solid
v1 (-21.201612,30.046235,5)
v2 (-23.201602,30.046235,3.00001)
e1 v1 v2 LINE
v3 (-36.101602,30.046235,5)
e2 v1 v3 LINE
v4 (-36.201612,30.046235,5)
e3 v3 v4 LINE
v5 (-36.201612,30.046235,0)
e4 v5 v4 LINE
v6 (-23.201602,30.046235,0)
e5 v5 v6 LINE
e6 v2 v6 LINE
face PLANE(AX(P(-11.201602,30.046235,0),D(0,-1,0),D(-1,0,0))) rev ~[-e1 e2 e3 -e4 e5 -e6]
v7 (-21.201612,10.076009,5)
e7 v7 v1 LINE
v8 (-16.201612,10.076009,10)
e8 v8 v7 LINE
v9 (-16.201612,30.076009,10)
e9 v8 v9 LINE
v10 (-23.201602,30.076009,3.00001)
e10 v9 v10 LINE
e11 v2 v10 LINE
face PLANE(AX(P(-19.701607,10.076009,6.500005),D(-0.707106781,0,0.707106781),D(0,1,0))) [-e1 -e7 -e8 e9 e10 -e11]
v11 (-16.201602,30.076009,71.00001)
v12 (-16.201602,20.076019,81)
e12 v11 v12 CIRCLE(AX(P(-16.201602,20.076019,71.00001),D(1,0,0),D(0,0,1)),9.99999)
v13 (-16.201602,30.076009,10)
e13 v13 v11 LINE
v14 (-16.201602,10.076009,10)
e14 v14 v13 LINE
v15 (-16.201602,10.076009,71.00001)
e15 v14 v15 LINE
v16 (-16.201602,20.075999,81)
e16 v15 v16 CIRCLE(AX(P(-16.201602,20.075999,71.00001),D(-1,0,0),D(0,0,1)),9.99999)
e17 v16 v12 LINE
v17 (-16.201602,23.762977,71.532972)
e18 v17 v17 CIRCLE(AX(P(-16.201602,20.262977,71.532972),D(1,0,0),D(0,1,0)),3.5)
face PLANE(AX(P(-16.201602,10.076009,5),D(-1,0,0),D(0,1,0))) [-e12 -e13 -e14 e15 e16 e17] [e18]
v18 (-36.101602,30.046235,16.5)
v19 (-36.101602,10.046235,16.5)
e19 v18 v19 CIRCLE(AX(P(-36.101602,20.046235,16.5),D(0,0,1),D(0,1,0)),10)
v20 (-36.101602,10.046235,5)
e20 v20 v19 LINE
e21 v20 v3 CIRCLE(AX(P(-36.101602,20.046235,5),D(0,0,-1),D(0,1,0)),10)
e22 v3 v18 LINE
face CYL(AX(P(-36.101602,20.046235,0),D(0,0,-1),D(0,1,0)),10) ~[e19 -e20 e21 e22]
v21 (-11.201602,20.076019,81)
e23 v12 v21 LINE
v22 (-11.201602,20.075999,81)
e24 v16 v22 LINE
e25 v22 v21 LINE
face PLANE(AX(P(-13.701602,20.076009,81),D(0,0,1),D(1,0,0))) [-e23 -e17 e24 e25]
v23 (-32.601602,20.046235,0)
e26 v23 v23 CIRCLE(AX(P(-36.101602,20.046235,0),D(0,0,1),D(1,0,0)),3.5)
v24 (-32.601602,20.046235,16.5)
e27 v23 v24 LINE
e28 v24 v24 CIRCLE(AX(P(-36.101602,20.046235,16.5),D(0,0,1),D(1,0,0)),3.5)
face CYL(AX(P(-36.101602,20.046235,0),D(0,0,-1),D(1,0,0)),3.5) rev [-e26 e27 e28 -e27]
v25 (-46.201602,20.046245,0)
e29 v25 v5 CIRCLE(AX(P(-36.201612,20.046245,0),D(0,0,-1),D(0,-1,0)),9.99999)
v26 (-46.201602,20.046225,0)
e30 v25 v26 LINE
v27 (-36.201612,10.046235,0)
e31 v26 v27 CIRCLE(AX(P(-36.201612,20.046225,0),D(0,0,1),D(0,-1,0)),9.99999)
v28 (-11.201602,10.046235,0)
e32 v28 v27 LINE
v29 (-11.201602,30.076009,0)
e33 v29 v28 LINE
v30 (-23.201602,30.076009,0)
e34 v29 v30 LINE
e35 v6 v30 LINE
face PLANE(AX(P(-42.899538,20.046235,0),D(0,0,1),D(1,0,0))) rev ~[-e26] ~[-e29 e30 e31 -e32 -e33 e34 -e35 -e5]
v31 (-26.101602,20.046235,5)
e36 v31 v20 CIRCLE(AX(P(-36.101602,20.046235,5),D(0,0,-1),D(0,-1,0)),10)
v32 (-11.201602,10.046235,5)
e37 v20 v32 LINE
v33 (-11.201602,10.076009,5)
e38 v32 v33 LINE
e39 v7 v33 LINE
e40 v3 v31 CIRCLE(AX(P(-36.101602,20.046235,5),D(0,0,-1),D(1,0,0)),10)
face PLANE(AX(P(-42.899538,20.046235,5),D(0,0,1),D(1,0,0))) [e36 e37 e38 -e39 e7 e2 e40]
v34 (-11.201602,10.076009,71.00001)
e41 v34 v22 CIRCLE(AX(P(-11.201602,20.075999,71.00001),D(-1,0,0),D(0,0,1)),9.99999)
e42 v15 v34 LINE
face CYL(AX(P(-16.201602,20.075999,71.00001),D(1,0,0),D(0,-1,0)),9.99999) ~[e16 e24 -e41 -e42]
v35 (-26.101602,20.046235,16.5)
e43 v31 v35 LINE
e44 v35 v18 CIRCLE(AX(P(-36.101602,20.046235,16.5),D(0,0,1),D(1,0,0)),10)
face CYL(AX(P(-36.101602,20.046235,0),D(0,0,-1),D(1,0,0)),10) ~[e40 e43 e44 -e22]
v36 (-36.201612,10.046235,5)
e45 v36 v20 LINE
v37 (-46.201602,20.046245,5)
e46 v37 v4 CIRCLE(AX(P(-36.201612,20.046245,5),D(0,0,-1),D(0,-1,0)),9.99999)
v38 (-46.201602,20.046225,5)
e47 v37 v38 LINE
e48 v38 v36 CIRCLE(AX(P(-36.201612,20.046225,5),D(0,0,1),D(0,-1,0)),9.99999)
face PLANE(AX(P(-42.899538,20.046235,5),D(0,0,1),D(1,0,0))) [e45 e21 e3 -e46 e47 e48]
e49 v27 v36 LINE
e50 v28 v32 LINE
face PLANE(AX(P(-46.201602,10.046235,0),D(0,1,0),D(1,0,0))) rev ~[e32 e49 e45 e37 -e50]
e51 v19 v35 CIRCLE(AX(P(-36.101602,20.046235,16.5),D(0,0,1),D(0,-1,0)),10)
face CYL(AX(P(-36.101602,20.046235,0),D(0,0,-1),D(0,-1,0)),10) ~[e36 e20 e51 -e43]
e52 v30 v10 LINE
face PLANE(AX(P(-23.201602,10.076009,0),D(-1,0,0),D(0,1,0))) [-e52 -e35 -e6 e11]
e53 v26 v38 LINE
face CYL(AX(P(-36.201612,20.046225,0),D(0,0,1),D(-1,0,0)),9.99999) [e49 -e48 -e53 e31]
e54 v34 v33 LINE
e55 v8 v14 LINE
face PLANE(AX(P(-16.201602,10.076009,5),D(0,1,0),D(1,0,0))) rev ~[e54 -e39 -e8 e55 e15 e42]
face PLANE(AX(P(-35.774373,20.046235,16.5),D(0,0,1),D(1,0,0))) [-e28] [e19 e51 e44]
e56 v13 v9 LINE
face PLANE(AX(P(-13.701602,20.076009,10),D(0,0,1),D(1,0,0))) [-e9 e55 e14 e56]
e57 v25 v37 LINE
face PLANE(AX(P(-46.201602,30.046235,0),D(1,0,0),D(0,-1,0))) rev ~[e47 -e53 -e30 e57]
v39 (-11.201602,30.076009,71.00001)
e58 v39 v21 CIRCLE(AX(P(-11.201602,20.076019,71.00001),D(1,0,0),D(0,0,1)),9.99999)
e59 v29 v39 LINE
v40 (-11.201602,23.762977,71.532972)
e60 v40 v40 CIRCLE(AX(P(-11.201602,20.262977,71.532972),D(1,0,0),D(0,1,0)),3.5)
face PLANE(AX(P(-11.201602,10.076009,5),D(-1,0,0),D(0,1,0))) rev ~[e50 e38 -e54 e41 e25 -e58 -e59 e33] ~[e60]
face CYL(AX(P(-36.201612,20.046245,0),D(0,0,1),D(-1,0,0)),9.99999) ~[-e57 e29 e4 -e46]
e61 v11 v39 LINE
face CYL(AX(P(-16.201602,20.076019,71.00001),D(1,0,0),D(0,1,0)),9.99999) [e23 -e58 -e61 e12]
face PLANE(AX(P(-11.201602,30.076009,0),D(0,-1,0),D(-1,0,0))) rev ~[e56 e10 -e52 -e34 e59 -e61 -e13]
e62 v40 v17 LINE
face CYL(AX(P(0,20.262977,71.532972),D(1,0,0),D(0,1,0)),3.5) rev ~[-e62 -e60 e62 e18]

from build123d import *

# Parameters (mm, degrees)
F0_R      = 3.5
F1_DEPTH  = 5
F2_R      = 9.99999
F4_START  = 5
F3_W      = 5
F3_H      = 20
F4_DEPTH  = 76
F5_R      = 3.5
F6_DEPTH  = 79.3
F7_R      = 9.99999
F8_DEPTH  = 16.5
F3_W_2    = 7
F9_DEPTH  = 10
F10_SIZE  = 6.99999
F11_DEPTH = 55.6


# Not quite as in the source:
# - a fillet or chamfer is up to 0.001 mm smaller than in the source, because OpenCascade refuses the exact size


with BuildPart() as f1:
    # F0 (on Top) → F1 (new body)
    with BuildSketch(Plane.XY):
        with BuildLine():
            Line((-36.1016022205, 30.0462352857), (-46.2016022205, 30.0462352857))
            Line((-46.2016022205, 30.0462352857), (-46.2016022205, 10.0462352857))
            Line((-46.2016022205, 10.0462352857), (-36.1016022205, 10.0462352857))
            ThreePointArc((-36.1016022205, 10.0462352857), (-46.1016022205, 20.0462352857), (-36.1016022205, 30.0462352857))
        make_face()
        with BuildLine():
            Line((-11.2016022205, 30.0462352857), (-36.1016022205, 30.0462352857))
            ThreePointArc((-36.1016022205, 30.0462352857), (-29.0305344087, 27.1173030976), (-26.1016022205, 20.0462352857))
            ThreePointArc((-26.1016022205, 20.0462352857), (-29.0305344087, 12.9751674738), (-36.1016022205, 10.0462352857))
            Line((-36.1016022205, 10.0462352857), (-11.2016022205, 10.0462352857))
            Line((-11.2016022205, 10.0462352857), (-11.2016022205, 30.0462352857))
        make_face()
        with BuildLine():
            ThreePointArc((-26.1016022205, 20.0462352857), (-29.0305344087, 27.1173030976), (-36.1016022205, 30.0462352857))
            ThreePointArc((-36.1016022205, 30.0462352857), (-46.1016022205, 20.0462352857), (-36.1016022205, 10.0462352857))
            ThreePointArc((-36.1016022205, 10.0462352857), (-29.0305344087, 12.9751674738), (-26.1016022205, 20.0462352857))
        make_face()
        with Locations((-36.1016022205, 20.0462352857)):
            Circle(F0_R, mode=Mode.SUBTRACT)
    extrude(amount=F1_DEPTH)

    # F2 (radius 10 in the source; OpenCascade refuses exactly that, so slightly less here)
    f2_edges = [f1.edges().sort_by_distance(p)[0] for p in [
        (-46.201602, 30.046235, 2.5),
        (-46.201602, 10.046235, 2.5),
    ]]
    fillet(f2_edges, radius=F2_R)

    # F3 (on Top) → F4 (join)
    with BuildSketch(Plane.XY.offset(F4_START)):
        with Locations((-13.7016022205, 20.0760087371)):
            Rectangle(F3_W, F3_H)
    extrude(amount=F4_DEPTH)

    # F5 (on Right) → F6 (cut)
    with BuildSketch(Plane.YZ):
        with Locations((20.2629771084, 71.5329723358)):
            Circle(F5_R)
    extrude(amount=F6_DEPTH, mode=Mode.SUBTRACT)

    # F7 (radius 10 in the source; OpenCascade refuses exactly that, so slightly less here)
    f7_edges = [f1.edges().sort_by_distance(p)[0] for p in [
        (-13.701602, 10.076009, 81),
        (-13.701602, 30.076009, 81),
    ]]
    fillet(f7_edges, radius=F7_R)

    # F0 (on Top) → F8 (join)
    with BuildSketch(Plane.XY):
        with BuildLine():
            ThreePointArc((-26.1016022205, 20.0462352857), (-29.0305344087, 27.1173030976), (-36.1016022205, 30.0462352857))
            ThreePointArc((-36.1016022205, 30.0462352857), (-46.1016022205, 20.0462352857), (-36.1016022205, 10.0462352857))
            ThreePointArc((-36.1016022205, 10.0462352857), (-29.0305344087, 12.9751674738), (-26.1016022205, 20.0462352857))
        make_face()
        with Locations((-36.1016022205, 20.0462352857)):
            Circle(F0_R, mode=Mode.SUBTRACT)
    extrude(amount=F8_DEPTH)

    # F3 (on Top) → F9 (join)
    with BuildSketch(Plane.XY):
        with Locations((-13.7016022205, 20.0760087371)):
            Rectangle(F3_W, F3_H)
        with Locations((-19.7016022205, 20.0760087371)):
            Rectangle(F3_W_2, F3_H)
    extrude(amount=F9_DEPTH)

    # F10 (size 7 in the source; OpenCascade refuses exactly that, so slightly less here)
    f10_edges = [f1.edges().sort_by_distance(p)[0] for p in [
        (-23.201602, 20.076009, 10),
    ]]
    chamfer(f10_edges, length=F10_SIZE)

    # F5 (on Right) → F11 (cut)
    with BuildSketch(Plane.YZ):
        with Locations((20.2629771084, 71.5329723358)):
            Circle(F5_R)
    extrude(amount=-F11_DEPTH, mode=Mode.SUBTRACT)


solid = f1.part
